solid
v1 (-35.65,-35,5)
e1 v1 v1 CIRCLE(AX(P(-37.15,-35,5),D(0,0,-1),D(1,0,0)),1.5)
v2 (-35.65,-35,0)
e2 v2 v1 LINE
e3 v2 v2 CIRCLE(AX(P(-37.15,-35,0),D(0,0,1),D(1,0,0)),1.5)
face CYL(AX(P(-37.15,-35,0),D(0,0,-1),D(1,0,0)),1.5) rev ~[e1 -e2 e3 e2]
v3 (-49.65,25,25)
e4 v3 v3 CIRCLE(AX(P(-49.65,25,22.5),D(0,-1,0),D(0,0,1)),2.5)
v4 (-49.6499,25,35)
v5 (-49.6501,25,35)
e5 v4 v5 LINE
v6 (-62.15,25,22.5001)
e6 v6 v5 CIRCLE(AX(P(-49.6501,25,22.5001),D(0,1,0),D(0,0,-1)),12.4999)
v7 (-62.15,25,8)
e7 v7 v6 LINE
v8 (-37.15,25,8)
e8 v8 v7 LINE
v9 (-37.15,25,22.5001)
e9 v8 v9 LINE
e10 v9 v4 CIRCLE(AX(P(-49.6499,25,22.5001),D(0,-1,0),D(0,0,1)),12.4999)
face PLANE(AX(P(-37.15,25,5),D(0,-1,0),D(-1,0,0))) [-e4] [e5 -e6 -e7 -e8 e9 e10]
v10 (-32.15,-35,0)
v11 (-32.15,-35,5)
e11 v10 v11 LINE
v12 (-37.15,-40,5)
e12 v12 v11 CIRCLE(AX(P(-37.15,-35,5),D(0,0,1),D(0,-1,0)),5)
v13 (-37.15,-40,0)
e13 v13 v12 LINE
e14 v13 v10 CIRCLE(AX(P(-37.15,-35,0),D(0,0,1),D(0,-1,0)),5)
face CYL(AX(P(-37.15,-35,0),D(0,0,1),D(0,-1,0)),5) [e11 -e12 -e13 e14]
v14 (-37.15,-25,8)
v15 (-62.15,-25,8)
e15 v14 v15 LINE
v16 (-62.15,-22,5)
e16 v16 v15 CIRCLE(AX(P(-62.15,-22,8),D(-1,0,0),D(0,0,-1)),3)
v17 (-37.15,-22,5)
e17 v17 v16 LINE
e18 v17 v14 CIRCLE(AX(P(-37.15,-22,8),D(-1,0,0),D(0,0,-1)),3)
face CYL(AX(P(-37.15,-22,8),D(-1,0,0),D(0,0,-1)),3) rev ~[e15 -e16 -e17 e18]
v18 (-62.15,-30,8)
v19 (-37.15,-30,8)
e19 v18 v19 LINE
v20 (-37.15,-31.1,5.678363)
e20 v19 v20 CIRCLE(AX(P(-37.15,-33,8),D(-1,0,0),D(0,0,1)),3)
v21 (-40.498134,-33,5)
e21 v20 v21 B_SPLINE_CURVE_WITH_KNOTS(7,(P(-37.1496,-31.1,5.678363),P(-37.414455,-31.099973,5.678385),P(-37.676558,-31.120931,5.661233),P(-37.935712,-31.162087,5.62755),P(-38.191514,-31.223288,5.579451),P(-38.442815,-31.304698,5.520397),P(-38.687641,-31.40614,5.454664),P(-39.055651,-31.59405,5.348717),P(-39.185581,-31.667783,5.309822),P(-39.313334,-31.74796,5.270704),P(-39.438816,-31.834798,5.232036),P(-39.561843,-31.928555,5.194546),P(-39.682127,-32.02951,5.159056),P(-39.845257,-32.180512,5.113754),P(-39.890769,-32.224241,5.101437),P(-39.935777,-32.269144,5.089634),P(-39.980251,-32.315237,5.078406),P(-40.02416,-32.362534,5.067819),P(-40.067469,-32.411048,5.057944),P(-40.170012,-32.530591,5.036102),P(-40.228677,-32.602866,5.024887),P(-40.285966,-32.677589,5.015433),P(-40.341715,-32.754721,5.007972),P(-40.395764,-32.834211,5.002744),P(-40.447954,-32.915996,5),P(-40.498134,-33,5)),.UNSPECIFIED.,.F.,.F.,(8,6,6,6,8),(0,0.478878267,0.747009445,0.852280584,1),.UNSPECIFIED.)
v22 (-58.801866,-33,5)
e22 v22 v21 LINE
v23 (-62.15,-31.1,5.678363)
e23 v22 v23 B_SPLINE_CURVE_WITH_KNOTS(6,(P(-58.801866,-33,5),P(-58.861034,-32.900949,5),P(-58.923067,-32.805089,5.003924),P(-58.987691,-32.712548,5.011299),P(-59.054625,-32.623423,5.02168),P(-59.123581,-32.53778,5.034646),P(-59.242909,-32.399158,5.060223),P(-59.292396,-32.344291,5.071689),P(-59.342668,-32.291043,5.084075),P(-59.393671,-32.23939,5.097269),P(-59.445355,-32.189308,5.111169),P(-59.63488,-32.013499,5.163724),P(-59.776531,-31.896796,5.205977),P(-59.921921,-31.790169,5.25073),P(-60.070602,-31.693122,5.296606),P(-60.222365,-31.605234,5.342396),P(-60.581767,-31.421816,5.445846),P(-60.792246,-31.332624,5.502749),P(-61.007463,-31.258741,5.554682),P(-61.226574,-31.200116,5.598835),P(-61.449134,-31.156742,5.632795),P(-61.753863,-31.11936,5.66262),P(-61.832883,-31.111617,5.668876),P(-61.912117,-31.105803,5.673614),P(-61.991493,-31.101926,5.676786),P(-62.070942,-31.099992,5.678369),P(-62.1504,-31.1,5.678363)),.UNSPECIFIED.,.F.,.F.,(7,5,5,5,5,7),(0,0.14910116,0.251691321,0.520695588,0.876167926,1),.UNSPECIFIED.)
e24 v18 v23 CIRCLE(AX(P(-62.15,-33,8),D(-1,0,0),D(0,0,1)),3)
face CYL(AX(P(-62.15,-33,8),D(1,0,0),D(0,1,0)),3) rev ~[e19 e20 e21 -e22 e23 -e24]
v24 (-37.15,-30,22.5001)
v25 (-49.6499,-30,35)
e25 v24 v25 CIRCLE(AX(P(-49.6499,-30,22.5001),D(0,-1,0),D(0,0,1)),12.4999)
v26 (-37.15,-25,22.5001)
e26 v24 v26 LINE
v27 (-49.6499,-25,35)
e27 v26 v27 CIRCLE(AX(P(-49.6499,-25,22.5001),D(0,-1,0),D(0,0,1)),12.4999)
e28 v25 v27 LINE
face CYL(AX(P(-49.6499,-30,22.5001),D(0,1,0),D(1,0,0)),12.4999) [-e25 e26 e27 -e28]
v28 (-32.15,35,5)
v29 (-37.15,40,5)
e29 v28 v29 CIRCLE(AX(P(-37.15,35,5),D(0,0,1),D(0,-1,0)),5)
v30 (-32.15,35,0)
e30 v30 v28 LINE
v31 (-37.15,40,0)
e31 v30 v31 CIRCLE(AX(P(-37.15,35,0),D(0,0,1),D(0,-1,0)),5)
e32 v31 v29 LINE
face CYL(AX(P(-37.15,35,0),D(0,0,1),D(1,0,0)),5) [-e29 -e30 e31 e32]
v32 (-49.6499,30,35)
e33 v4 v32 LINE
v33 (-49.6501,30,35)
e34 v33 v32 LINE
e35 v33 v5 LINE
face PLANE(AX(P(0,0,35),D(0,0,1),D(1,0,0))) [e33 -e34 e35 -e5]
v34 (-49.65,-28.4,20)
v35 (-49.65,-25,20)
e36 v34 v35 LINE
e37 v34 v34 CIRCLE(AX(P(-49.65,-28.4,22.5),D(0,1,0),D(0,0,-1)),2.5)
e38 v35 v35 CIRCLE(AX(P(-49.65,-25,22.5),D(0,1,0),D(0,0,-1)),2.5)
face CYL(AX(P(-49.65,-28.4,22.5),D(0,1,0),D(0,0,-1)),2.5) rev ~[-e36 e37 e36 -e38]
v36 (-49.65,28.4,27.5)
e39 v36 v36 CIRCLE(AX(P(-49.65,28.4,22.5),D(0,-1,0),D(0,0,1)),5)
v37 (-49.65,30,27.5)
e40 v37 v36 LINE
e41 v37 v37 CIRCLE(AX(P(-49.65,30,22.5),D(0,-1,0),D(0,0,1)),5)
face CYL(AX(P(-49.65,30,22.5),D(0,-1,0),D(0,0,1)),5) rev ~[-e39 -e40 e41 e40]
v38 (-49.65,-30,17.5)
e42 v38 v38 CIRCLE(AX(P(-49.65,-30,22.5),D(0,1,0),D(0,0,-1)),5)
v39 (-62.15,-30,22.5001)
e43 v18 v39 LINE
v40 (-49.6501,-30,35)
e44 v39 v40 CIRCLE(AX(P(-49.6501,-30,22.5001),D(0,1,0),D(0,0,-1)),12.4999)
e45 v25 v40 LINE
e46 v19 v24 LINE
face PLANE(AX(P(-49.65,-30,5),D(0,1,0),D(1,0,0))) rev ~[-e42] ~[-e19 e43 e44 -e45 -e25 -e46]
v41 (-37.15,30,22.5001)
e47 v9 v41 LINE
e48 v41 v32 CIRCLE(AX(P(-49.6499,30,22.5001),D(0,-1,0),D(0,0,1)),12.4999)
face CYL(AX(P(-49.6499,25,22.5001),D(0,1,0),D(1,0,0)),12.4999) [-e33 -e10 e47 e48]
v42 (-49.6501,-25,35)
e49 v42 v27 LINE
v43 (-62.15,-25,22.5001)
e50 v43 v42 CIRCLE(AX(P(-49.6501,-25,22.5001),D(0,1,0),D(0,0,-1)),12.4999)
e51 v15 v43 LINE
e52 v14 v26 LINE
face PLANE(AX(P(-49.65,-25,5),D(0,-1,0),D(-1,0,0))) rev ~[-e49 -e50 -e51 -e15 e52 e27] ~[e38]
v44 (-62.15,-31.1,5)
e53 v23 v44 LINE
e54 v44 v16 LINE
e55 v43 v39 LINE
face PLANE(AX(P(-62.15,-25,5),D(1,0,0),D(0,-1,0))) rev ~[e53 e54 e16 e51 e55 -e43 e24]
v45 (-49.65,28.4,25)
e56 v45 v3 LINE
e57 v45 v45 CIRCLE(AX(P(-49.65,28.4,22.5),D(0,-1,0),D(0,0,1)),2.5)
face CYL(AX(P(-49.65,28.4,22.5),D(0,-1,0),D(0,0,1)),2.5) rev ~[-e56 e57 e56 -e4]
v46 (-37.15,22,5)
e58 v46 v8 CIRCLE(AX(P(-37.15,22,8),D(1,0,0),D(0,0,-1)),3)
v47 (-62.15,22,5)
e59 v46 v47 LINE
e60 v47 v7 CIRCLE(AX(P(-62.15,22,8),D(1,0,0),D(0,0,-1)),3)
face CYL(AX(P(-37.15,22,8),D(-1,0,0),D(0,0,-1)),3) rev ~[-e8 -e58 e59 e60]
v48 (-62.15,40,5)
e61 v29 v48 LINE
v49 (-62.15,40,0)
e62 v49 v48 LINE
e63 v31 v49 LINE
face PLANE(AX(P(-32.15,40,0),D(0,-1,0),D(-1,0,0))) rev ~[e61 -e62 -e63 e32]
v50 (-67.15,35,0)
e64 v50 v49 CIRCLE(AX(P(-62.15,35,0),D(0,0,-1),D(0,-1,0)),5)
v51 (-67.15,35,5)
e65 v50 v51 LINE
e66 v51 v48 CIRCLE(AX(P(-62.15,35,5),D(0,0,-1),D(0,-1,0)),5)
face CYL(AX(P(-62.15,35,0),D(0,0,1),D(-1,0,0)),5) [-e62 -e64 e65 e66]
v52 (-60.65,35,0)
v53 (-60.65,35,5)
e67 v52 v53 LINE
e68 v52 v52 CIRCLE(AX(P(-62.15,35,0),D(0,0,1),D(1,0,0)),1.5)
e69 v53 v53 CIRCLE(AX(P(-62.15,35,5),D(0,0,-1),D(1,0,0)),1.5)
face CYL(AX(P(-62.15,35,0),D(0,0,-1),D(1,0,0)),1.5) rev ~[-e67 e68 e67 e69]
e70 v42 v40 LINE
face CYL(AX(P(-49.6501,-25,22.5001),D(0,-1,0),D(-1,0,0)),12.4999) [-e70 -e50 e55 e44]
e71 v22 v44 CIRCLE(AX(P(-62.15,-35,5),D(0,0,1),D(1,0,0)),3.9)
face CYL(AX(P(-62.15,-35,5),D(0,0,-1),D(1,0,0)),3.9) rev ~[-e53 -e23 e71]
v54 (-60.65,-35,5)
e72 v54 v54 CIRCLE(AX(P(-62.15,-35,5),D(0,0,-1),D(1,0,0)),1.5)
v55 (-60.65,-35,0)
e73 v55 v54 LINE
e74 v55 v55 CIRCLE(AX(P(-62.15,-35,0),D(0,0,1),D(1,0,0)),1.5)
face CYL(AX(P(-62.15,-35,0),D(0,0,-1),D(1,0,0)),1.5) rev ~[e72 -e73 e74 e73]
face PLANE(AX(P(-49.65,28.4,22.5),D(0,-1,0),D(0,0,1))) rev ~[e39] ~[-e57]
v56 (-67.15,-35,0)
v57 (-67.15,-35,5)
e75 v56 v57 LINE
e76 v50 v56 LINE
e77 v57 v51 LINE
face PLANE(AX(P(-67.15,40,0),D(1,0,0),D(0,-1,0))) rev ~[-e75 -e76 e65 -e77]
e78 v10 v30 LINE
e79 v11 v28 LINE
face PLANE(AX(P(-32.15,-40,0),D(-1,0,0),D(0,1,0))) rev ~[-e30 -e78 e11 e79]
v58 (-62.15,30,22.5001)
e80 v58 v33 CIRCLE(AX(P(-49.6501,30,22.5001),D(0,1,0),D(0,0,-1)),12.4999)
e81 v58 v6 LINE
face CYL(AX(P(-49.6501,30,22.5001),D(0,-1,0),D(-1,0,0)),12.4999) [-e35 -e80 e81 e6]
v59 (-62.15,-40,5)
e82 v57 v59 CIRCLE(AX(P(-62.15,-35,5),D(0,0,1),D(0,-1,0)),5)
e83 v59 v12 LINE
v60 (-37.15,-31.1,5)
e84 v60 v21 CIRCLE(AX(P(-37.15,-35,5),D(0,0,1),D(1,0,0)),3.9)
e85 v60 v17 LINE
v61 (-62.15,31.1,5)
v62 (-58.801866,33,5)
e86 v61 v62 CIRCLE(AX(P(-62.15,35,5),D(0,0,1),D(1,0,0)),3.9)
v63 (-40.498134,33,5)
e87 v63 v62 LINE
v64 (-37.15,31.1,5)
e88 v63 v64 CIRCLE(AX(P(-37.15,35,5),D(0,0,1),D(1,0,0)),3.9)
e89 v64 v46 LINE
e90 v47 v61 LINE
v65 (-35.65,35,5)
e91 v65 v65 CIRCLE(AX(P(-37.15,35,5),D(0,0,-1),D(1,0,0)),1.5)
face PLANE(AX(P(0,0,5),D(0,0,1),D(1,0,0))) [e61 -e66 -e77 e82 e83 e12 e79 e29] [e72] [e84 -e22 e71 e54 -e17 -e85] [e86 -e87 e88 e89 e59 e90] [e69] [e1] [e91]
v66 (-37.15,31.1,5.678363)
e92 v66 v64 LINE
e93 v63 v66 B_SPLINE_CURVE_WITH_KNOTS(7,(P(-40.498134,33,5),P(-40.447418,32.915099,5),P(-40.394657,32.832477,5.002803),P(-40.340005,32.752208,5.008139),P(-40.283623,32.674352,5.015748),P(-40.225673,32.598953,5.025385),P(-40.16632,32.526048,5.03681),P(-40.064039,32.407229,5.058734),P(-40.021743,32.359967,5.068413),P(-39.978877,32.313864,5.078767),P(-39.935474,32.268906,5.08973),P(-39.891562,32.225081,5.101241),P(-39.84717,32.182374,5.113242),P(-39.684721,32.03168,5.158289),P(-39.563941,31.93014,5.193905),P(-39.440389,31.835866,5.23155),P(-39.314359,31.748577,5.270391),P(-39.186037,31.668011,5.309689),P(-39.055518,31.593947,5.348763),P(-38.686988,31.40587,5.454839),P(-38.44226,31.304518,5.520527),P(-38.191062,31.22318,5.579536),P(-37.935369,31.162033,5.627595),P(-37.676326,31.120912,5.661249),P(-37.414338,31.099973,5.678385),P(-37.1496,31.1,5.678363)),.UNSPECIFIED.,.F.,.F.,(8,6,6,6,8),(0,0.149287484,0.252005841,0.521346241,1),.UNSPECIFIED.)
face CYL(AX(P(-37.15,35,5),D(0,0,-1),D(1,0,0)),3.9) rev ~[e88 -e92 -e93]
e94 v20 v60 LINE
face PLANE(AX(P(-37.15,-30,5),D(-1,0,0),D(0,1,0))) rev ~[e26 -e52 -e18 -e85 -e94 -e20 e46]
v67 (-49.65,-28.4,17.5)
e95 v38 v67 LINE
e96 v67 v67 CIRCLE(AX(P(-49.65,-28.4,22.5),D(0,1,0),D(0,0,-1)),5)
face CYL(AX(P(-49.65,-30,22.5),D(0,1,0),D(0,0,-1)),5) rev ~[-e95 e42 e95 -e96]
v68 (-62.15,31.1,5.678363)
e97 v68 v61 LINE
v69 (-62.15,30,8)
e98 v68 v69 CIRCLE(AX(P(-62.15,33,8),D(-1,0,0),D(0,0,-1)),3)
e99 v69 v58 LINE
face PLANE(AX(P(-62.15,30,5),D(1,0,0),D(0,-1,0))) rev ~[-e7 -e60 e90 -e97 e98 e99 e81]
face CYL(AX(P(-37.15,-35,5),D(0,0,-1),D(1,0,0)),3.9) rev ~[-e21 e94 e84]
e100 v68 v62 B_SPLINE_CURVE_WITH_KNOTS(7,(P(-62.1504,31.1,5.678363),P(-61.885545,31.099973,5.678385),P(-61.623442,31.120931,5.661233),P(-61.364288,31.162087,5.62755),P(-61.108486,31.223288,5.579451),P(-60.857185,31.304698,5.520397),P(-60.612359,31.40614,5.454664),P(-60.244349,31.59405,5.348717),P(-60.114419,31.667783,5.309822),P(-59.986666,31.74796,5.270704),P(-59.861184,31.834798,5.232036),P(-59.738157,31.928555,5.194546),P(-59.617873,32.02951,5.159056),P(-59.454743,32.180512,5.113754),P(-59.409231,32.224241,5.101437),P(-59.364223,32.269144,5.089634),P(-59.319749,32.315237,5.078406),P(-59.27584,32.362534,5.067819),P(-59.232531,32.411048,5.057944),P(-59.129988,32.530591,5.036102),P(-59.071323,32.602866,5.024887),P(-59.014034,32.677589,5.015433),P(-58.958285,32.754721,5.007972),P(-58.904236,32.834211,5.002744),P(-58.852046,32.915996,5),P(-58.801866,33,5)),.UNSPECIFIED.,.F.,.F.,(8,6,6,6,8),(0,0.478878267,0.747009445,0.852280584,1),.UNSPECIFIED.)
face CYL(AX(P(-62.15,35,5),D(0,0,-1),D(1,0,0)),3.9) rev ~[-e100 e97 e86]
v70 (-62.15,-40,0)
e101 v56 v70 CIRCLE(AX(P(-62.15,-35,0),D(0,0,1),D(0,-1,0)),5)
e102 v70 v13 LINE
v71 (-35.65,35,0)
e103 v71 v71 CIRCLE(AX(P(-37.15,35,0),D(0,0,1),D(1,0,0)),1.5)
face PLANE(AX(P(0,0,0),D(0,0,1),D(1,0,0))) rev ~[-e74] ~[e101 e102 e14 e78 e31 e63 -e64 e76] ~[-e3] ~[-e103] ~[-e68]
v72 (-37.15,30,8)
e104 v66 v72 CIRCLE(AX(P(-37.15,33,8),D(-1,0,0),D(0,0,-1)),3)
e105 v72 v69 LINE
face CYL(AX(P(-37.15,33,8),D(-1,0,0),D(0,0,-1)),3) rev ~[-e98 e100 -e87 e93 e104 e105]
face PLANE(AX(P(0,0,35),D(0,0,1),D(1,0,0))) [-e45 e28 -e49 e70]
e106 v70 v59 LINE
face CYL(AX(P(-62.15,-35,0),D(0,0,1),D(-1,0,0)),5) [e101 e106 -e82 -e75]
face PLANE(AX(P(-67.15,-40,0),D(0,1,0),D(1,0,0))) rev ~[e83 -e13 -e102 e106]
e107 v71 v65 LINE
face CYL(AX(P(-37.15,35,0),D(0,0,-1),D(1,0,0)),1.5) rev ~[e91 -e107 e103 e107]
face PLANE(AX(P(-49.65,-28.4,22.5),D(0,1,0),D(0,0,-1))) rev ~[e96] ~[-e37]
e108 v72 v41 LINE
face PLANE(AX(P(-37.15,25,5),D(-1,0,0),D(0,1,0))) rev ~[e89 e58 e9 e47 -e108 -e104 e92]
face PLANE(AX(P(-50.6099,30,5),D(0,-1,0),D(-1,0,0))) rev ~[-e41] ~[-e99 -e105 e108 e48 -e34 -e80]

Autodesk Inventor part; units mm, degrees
ref_plane "YZ Plane" through (0, 0, 0) normal (1, 0, 0) x (0, 1, 0)
ref_plane "XZ Plane" through (0, 0, 0) normal (0, 1, 0) x (-1, 0, 0)
ref_plane "XY Plane" through (0, 0, 0) normal (0, 0, 1) x (1, 0, 0)
sketch "Boceto1" plane through (0, 0, 0) normal (0, 0, 1) x (1, 0, 0)
  line L0 (75.85, 9) -> (75.85, -9) projected
  line L1 (75.85, 9) -> (95.85, 9) projected
  line L2 (95.85, -9) -> (95.85, 9) projected
  line L3 (105.85, -146.9) -> (105.85, 146.9) projected
  line L4 (105.85, 146.9) -> (112.15, 146.9) projected
  line L5 (112.15, 146.9) -> (112.15, 160) projected
  line L6 (112.15, 160) -> (105.85, 160) projected
  line L7 (105.85, 160) -> (105.85, 180) projected
  line L8 (105.85, 180) -> (-100.9, 180) projected
  line L9 (-100.9, 180) -> (-100.9, 160) projected
  line L10 (-100.9, 160) -> (-108.4, 160) projected
  line L11 (-108.4, 160) -> (-108.4, 145) projected
  line L12 (-108.4, 145) -> (-100.9, 145) projected
  line L13 (-100.9, 145) -> (-100.9, 142) projected
  line L14 (-100.9, 142) -> (-112.15, 142) projected
  line L15 (-112.15, 142) -> (-112.15, -142) projected
  line L16 (15.85, 9) -> (15.85, -9) projected
  line L17 (15.85, 9) -> (35.85, 9) projected
  line L18 (35.85, -9) -> (35.85, 9) projected
  line L19 (20.45, 169.8) -> (20.45, 163.3) projected
  line L20 (20.45, 163.3) -> (13.95, 163.3) projected
  line L21 (13.95, 163.3) -> (13.95, 169.8) projected
  line L22 (13.95, 169.8) -> (20.45, 169.8) projected
  line L23 (78.15, 169.8) -> (78.15, 163.3) projected
  line L24 (78.15, 163.3) -> (71.65, 163.3) projected
  line L25 (71.65, 163.3) -> (71.65, 169.8) projected
  line L26 (71.65, 169.8) -> (78.15, 169.8) projected
  line L27 (-4.15, 163.3) -> (-4.15, 169.8) projected
  line L28 (-4.15, 169.8) -> (2.35, 169.8) projected
  line L29 (2.35, 169.8) -> (2.35, 163.3) projected
  line L30 (2.35, 163.3) -> (-4.15, 163.3) projected
  line L31 (38.55, 169.8) -> (38.55, 163.3) projected
  line L32 (38.55, 163.3) -> (32.05, 163.3) projected
  line L33 (32.05, 163.3) -> (32.05, 169.8) projected
  line L34 (32.05, 169.8) -> (38.55, 169.8) projected
  line L35 (56.65, 169.8) -> (56.65, 163.3) projected
  line L36 (56.65, 163.3) -> (50.15, 163.3) projected
  line L37 (50.15, 163.3) -> (50.15, 169.8) projected
  line L38 (50.15, 169.8) -> (56.65, 169.8) projected
  line L39 (-14.65, 175.8) -> (-14.65, 157.7) projected
  line L40 (-14.65, 157.7) -> (-22.65, 157.7) projected
  line L41 (-22.65, 157.7) -> (-22.65, 175.8) projected
  line L42 (-22.65, 175.8) -> (-14.65, 175.8) projected
  line L43 (35.85, -9) -> (35.85, 9) projected
  line L44 (35.85, -9) -> (15.85, -9) projected
  line L45 (15.85, 9) -> (15.85, -9) projected
  line L46 (-112.15, 142) -> (-112.15, -142) projected
  line L47 (-112.15, -142) -> (-100.9, -142) projected
  line L48 (-100.9, -142) -> (-100.9, -145) projected
  line L49 (-100.9, -145) -> (-108.4, -145) projected
  line L50 (-108.4, -145) -> (-108.4, -160) projected
  line L51 (-108.4, -160) -> (-100.9, -160) projected
  line L52 (-100.9, -160) -> (-100.9, -180) projected
  line L53 (-100.9, -180) -> (105.85, -180) projected
  line L54 (105.85, -180) -> (105.85, -160) projected
  line L55 (105.85, -160) -> (112.15, -160) projected
  line L56 (112.15, -160) -> (112.15, -146.9) projected
  line L57 (112.15, -146.9) -> (105.85, -146.9) projected
  line L58 (105.85, -146.9) -> (105.85, 146.9) projected
  line L59 (95.85, -9) -> (95.85, 9) projected
  line L60 (95.85, -9) -> (75.85, -9) projected
  line L61 (75.85, 9) -> (75.85, -9) projected
  circle A0 centre (-103.8, -156.7) radius 1.5 projected
  line L62 (-25.85, -52.4) -> (-25.85, -57.4) projected
  line L63 (-25.85, -57.4) -> (-8.15, -57.4) projected
  arc A1 (-3.15, -62.4) -> (-8.15, -57.4) centre (-8.15, -62.4) ccw projected
  line L64 (-3.15, -62.4) -> (-3.15, -87.4) projected
  line L65 (-3.15, -87.4) -> (-2.05, -87.4) projected
  line L66 (-2.05, -87.4) -> (-2.05, -107.4) projected
  line L67 (-2.05, -107.4) -> (-3.15, -107.4) projected
  line L68 (-3.15, -107.4) -> (-3.15, -169.7804) projected
  arc A2 (-8.15, -174.7804) -> (-3.15, -169.7804) centre (-8.15, -169.7804) ccw projected
  line L69 (-8.15, -174.7804) -> (-67.5256, -174.7804) projected
  line L70 (-67.5256, -174.7804) -> (-67.5256, -57.4) projected
  line L71 (-67.5256, -57.4) -> (-48.05, -57.4) projected
  line L72 (-48.05, -57.4) -> (-48.05, -52.4) projected
  line L73 (-48.05, -52.4) -> (-25.85, -52.4) projected
  line L74 (-112.15, 0) -> (-67.15, 0)
  line L75 (-67.15, 0) -> (-67.15, -40)
  line L76 (-67.15, -40) -> (-32.15, -40)
  line L77 (-32.15, -40) -> (-32.15, 40)
  line L78 (-32.15, 40) -> (-67.15, 40)
  line L79 (-67.15, 40) -> (-67.15, 0)
  line L80 (-37.15, 35) -> (-37.15, -35)
  line L81 (-37.15, -35) -> (-62.15, -35)
  line L82 (-62.15, -35) -> (-62.15, 0)
  line L83 (-62.15, 0) -> (-62.15, 35)
  line L84 (-62.15, 35) -> (-37.15, 35)
  circle A3 centre (-37.15, 35) radius 1.5
  circle A4 centre (-37.15, -35) radius 1.5
  circle A5 centre (-62.15, -35) radius 1.5
  circle A6 centre (-62.15, 35) radius 1.5
  circle A7 centre (-37.15, -35) radius 1.6 projected
  circle A8 centre (-37.15, 35) radius 1.6 projected
  circle A9 centre (-62.15, 35) radius 1.6 projected
  circle A10 centre (-62.15, -35) radius 1.6 projected
  line L85 (75.85, 9) -> (95.85, 9) projected
  line L86 (15.85, 9) -> (35.85, 9) projected
  line L87 (20.45, 169.8) -> (20.45, 163.3) projected
  line L88 (20.45, 163.3) -> (13.95, 163.3) projected
  line L89 (13.95, 163.3) -> (13.95, 169.8) projected
  line L90 (13.95, 169.8) -> (20.45, 169.8) projected
  line L91 (78.15, 169.8) -> (78.15, 163.3) projected
  line L92 (78.15, 163.3) -> (71.65, 163.3) projected
  line L93 (71.65, 163.3) -> (71.65, 169.8) projected
  line L94 (71.65, 169.8) -> (78.15, 169.8) projected
  line L95 (-4.15, 163.3) -> (-4.15, 169.8) projected
  line L96 (-4.15, 169.8) -> (2.35, 169.8) projected
  line L97 (2.35, 169.8) -> (2.35, 163.3) projected
  line L98 (2.35, 163.3) -> (-4.15, 163.3) projected
  line L99 (38.55, 169.8) -> (38.55, 163.3) projected
  line L100 (38.55, 163.3) -> (32.05, 163.3) projected
  line L101 (32.05, 163.3) -> (32.05, 169.8) projected
  line L102 (32.05, 169.8) -> (38.55, 169.8) projected
  line L103 (56.65, 169.8) -> (56.65, 163.3) projected
  line L104 (56.65, 163.3) -> (50.15, 163.3) projected
  line L105 (50.15, 163.3) -> (50.15, 169.8) projected
  line L106 (50.15, 169.8) -> (56.65, 169.8) projected
  line L107 (-14.65, 175.8) -> (-14.65, 157.7) projected
  line L108 (-14.65, 157.7) -> (-22.65, 157.7) projected
  line L109 (-22.65, 157.7) -> (-22.65, 175.8) projected
  line L110 (-22.65, 175.8) -> (-14.65, 175.8) projected
  line L111 (-100.9, 142) -> (-112.15, 142) projected
  line L112 (105.85, 146.9) -> (112.15, 146.9) projected
  line L113 (112.15, 146.9) -> (112.15, 160) projected
  line L114 (112.15, 160) -> (105.85, 160) projected
  line L115 (105.85, 160) -> (105.85, 180) projected
  line L116 (105.85, 180) -> (-100.9, 180) projected
  line L117 (-100.9, 180) -> (-100.9, 160) projected
  line L118 (-100.9, 160) -> (-108.4, 160) projected
  line L119 (-108.4, 160) -> (-108.4, 145) projected
  line L120 (-108.4, 145) -> (-100.9, 145) projected
  line L121 (-100.9, 145) -> (-100.9, 142) projected
  circle A11 centre (-37.15, -35) radius 1.6 projected
  circle A12 centre (-37.15, 35) radius 1.6 projected
  circle A13 centre (-62.15, 35) radius 1.6 projected
  circle A14 centre (-62.15, -35) radius 1.6 projected
  line L122 (95.85, -9) -> (75.85, -9) projected
  line L123 (35.85, -9) -> (15.85, -9) projected
  line L124 (-25.85, -52.4) -> (-25.85, -57.4) projected
  line L125 (-25.85, -57.4) -> (-8.15, -57.4) projected
  arc A15 (-3.15, -62.4) -> (-8.15, -57.4) centre (-8.15, -62.4) ccw projected
  line L126 (-3.15, -62.4) -> (-3.15, -87.4) projected
  line L127 (-3.15, -87.4) -> (-2.05, -87.4) projected
  line L128 (-2.05, -87.4) -> (-2.05, -107.4) projected
  line L129 (-2.05, -107.4) -> (-3.15, -107.4) projected
  line L130 (-3.15, -107.4) -> (-3.15, -169.7804) projected
  arc A16 (-8.15, -174.7804) -> (-3.15, -169.7804) centre (-8.15, -169.7804) ccw projected
  line L131 (-8.15, -174.7804) -> (-67.5256, -174.7804) projected
  line L132 (-67.5256, -174.7804) -> (-67.5256, -57.4) projected
  line L133 (-67.5256, -57.4) -> (-48.05, -57.4) projected
  line L134 (-48.05, -57.4) -> (-48.05, -52.4) projected
  line L135 (-48.05, -52.4) -> (-25.85, -52.4) projected
  circle A17 centre (-103.8, -156.7) radius 1.5 projected
  line L136 (-112.15, -142) -> (-100.9, -142) projected
  line L137 (-100.9, -142) -> (-100.9, -145) projected
  line L138 (-100.9, -145) -> (-108.4, -145) projected
  line L139 (-108.4, -145) -> (-108.4, -160) projected
  line L140 (-108.4, -160) -> (-100.9, -160) projected
  line L141 (-100.9, -160) -> (-100.9, -180) projected
  line L142 (-100.9, -180) -> (105.85, -180) projected
  line L143 (105.85, -180) -> (105.85, -160) projected
  line L144 (105.85, -160) -> (112.15, -160) projected
  line L145 (112.15, -160) -> (112.15, -146.9) projected
  line L146 (112.15, -146.9) -> (105.85, -146.9) projected
  dimension "d0" = 45
  dimension "d1" = 40
  dimension "d2" = 35
  dimension "d3" = 80
  dimension "d4" = 5
  dimension "d5" = 3
  dimension "d6" = 3
  dimension "d7" = 3
  dimension "d8" = 3
extrude "Extrusión1" add sketch "Boceto1" along normal blind 5 contours L79 L78 L77 L76 L75 | A3 L84 A8 L80 | L80 A8 L84 A3 | L80 A7 L81 A10 L82 L83 A9 L84 A8 | A7 L81 A4 L80 | L80 A4 L81 A7 | A9 L83 A6 L84 | L84 A6 L83 A9 | A10 L82 A5 L81 | L81 A5 L82 A10
sketch "Boceto2" plane through (0, 0, 5) normal (0, 0, 1) x (1, 0, 0)
  circle A0 centre (-37.15, 35) radius 1.5 projected
  circle A1 centre (-62.15, -35) radius 1.5 projected
  line L0 (-37.15, 35) -> (-62.15, 35)
  line L1 (-62.15, 35) -> (-62.15, -35)
  line L2 (-62.15, -35) -> (-37.15, -35)
  line L3 (-37.15, -35) -> (-37.15, 35)
  line L4 (-50.6099, 35) -> (-50.6099, 30)
  line L5 (-37.15, 30) -> (-62.15, 30)
  line L6 (-37.15, 25) -> (-62.15, 25)
  line L7 (-49.65, -35) -> (-49.65, -30)
  line L8 (-49.65, -25) -> (-37.15, -25)
  line L9 (-49.65, -30) -> (-37.15, -30)
  line L10 (-49.65, -30) -> (-62.15, -30)
  line L11 (-62.15, -30) -> (-37.15, -30)
  line L12 (-37.15, -30) -> (-37.15, -25)
  line L13 (-37.15, -25) -> (-62.15, -25)
  line L14 (-62.15, -25) -> (-62.15, -30)
  point P0 (0, 0)
  dimension "d11" = 5
  dimension "d12" = 5
  dimension "d13" = 5
  dimension "d14" = 5
extrude "Extrusión2" add sketch "Boceto2" along normal blind 30 contours L3 L6 L1 L5 | L3 L9 L10 L1 L13 L8
fillet "Empalme1" radius 12.5 4 edges at (-37.15, 27.5, 35) (-62.15, 27.5, 35) (-37.15, -27.5, 35) (-62.15, -27.5, 35)
fillet "Empalme2" radius 3 4 edges at (-49.65, 30, 5) (-49.65, 25, 5) (-49.65, -25, 5) (-49.65, -30, 5)
sketch "Boceto3" plane through (0, 0, 5) normal (0, 0, 1) x (1, 0, 0)
  line L0 (-62.15, -33) -> (-62.15, -22) projected
  line L1 (-37.15, -22) -> (-62.15, -22) projected
  line L2 (-37.15, -22) -> (-37.15, -33) projected
  line L3 (-62.15, -33) -> (-37.15, -33) projected
  line L4 (-62.15, 22) -> (-62.15, 33) projected
  line L5 (-37.15, 33) -> (-62.15, 33) projected
  line L6 (-37.15, 33) -> (-37.15, 22) projected
  line L7 (-62.15, 22) -> (-37.15, 22) projected
  line L8 (-32.15, 40) -> (-67.15, 40) projected
  line L9 (-67.15, 40) -> (-67.15, -40) projected
  line L10 (-67.15, -40) -> (-32.15, -40) projected
  line L11 (-32.15, -40) -> (-32.15, 40) projected
  circle A0 centre (-62.15, -35) radius 1.5 projected
  circle A1 centre (-37.15, -35) radius 1.5 projected
  circle A2 centre (-37.15, 35) radius 1.5 projected
  circle A3 centre (-62.15, 35) radius 1.5 projected
  circle A4 centre (-62.15, 35) radius 3.9
  circle A5 centre (-37.15, 35) radius 3.9
  circle A6 centre (-62.15, -35) radius 1.5 projected
  circle A7 centre (-62.15, -35) radius 3.9
  circle A8 centre (-37.15, -35) radius 3.9
  point P0 (0, 0)
  dimension "d19" = 7.8
  dimension "d20" = 7.8
  dimension "d21" = 7.8
  dimension "d22" = 7.8
extrude "Extrusión3" cut sketch "Boceto3" along normal blind 30 contours L3 A7 L0 | L0 A7 L3 | A8 L2 L3 | L3 L2 A8 | A4 L5 L4 | L4 L5 A4 | A5 L5 L6 | L6 L5 A5
sketch "Boceto4" plane through (-49.65, 30, 22.5) normal (0, 1, 0) x (1, 0, 0)
  arc A0 (-12.5, 0) -> (12.5, 0) centre (0, 0) ccw projected
  point P0 (49.65, 22.5)
hole "Agujero1" at (-49.65, 30, 22.5) direction (0, -1, 0) diameter 5 depth 5 counterbore diameter 10 counterbore depth 1.6
sketch "Boceto5" plane through (-49.65, -30, 22.5) normal (0, -1, 0) x (1, 0, 0)
  arc A0 (12.5, 0) -> (-12.5, 0) centre (0, 0) ccw projected
  point P0 (49.65, -22.5)
hole "Agujero2" at (-49.65, -30, 22.5) direction (0, 1, 0) diameter 5 depth 5 counterbore diameter 10 counterbore depth 1.6
fillet "Empalme3" radius 5 4 edges at (-32.15, 40, 2.5) (-67.15, 40, 2.5) (-67.15, -40, 2.5) (-32.15, -40, 2.5)
properties part number "UnionBrazoPantalla"
